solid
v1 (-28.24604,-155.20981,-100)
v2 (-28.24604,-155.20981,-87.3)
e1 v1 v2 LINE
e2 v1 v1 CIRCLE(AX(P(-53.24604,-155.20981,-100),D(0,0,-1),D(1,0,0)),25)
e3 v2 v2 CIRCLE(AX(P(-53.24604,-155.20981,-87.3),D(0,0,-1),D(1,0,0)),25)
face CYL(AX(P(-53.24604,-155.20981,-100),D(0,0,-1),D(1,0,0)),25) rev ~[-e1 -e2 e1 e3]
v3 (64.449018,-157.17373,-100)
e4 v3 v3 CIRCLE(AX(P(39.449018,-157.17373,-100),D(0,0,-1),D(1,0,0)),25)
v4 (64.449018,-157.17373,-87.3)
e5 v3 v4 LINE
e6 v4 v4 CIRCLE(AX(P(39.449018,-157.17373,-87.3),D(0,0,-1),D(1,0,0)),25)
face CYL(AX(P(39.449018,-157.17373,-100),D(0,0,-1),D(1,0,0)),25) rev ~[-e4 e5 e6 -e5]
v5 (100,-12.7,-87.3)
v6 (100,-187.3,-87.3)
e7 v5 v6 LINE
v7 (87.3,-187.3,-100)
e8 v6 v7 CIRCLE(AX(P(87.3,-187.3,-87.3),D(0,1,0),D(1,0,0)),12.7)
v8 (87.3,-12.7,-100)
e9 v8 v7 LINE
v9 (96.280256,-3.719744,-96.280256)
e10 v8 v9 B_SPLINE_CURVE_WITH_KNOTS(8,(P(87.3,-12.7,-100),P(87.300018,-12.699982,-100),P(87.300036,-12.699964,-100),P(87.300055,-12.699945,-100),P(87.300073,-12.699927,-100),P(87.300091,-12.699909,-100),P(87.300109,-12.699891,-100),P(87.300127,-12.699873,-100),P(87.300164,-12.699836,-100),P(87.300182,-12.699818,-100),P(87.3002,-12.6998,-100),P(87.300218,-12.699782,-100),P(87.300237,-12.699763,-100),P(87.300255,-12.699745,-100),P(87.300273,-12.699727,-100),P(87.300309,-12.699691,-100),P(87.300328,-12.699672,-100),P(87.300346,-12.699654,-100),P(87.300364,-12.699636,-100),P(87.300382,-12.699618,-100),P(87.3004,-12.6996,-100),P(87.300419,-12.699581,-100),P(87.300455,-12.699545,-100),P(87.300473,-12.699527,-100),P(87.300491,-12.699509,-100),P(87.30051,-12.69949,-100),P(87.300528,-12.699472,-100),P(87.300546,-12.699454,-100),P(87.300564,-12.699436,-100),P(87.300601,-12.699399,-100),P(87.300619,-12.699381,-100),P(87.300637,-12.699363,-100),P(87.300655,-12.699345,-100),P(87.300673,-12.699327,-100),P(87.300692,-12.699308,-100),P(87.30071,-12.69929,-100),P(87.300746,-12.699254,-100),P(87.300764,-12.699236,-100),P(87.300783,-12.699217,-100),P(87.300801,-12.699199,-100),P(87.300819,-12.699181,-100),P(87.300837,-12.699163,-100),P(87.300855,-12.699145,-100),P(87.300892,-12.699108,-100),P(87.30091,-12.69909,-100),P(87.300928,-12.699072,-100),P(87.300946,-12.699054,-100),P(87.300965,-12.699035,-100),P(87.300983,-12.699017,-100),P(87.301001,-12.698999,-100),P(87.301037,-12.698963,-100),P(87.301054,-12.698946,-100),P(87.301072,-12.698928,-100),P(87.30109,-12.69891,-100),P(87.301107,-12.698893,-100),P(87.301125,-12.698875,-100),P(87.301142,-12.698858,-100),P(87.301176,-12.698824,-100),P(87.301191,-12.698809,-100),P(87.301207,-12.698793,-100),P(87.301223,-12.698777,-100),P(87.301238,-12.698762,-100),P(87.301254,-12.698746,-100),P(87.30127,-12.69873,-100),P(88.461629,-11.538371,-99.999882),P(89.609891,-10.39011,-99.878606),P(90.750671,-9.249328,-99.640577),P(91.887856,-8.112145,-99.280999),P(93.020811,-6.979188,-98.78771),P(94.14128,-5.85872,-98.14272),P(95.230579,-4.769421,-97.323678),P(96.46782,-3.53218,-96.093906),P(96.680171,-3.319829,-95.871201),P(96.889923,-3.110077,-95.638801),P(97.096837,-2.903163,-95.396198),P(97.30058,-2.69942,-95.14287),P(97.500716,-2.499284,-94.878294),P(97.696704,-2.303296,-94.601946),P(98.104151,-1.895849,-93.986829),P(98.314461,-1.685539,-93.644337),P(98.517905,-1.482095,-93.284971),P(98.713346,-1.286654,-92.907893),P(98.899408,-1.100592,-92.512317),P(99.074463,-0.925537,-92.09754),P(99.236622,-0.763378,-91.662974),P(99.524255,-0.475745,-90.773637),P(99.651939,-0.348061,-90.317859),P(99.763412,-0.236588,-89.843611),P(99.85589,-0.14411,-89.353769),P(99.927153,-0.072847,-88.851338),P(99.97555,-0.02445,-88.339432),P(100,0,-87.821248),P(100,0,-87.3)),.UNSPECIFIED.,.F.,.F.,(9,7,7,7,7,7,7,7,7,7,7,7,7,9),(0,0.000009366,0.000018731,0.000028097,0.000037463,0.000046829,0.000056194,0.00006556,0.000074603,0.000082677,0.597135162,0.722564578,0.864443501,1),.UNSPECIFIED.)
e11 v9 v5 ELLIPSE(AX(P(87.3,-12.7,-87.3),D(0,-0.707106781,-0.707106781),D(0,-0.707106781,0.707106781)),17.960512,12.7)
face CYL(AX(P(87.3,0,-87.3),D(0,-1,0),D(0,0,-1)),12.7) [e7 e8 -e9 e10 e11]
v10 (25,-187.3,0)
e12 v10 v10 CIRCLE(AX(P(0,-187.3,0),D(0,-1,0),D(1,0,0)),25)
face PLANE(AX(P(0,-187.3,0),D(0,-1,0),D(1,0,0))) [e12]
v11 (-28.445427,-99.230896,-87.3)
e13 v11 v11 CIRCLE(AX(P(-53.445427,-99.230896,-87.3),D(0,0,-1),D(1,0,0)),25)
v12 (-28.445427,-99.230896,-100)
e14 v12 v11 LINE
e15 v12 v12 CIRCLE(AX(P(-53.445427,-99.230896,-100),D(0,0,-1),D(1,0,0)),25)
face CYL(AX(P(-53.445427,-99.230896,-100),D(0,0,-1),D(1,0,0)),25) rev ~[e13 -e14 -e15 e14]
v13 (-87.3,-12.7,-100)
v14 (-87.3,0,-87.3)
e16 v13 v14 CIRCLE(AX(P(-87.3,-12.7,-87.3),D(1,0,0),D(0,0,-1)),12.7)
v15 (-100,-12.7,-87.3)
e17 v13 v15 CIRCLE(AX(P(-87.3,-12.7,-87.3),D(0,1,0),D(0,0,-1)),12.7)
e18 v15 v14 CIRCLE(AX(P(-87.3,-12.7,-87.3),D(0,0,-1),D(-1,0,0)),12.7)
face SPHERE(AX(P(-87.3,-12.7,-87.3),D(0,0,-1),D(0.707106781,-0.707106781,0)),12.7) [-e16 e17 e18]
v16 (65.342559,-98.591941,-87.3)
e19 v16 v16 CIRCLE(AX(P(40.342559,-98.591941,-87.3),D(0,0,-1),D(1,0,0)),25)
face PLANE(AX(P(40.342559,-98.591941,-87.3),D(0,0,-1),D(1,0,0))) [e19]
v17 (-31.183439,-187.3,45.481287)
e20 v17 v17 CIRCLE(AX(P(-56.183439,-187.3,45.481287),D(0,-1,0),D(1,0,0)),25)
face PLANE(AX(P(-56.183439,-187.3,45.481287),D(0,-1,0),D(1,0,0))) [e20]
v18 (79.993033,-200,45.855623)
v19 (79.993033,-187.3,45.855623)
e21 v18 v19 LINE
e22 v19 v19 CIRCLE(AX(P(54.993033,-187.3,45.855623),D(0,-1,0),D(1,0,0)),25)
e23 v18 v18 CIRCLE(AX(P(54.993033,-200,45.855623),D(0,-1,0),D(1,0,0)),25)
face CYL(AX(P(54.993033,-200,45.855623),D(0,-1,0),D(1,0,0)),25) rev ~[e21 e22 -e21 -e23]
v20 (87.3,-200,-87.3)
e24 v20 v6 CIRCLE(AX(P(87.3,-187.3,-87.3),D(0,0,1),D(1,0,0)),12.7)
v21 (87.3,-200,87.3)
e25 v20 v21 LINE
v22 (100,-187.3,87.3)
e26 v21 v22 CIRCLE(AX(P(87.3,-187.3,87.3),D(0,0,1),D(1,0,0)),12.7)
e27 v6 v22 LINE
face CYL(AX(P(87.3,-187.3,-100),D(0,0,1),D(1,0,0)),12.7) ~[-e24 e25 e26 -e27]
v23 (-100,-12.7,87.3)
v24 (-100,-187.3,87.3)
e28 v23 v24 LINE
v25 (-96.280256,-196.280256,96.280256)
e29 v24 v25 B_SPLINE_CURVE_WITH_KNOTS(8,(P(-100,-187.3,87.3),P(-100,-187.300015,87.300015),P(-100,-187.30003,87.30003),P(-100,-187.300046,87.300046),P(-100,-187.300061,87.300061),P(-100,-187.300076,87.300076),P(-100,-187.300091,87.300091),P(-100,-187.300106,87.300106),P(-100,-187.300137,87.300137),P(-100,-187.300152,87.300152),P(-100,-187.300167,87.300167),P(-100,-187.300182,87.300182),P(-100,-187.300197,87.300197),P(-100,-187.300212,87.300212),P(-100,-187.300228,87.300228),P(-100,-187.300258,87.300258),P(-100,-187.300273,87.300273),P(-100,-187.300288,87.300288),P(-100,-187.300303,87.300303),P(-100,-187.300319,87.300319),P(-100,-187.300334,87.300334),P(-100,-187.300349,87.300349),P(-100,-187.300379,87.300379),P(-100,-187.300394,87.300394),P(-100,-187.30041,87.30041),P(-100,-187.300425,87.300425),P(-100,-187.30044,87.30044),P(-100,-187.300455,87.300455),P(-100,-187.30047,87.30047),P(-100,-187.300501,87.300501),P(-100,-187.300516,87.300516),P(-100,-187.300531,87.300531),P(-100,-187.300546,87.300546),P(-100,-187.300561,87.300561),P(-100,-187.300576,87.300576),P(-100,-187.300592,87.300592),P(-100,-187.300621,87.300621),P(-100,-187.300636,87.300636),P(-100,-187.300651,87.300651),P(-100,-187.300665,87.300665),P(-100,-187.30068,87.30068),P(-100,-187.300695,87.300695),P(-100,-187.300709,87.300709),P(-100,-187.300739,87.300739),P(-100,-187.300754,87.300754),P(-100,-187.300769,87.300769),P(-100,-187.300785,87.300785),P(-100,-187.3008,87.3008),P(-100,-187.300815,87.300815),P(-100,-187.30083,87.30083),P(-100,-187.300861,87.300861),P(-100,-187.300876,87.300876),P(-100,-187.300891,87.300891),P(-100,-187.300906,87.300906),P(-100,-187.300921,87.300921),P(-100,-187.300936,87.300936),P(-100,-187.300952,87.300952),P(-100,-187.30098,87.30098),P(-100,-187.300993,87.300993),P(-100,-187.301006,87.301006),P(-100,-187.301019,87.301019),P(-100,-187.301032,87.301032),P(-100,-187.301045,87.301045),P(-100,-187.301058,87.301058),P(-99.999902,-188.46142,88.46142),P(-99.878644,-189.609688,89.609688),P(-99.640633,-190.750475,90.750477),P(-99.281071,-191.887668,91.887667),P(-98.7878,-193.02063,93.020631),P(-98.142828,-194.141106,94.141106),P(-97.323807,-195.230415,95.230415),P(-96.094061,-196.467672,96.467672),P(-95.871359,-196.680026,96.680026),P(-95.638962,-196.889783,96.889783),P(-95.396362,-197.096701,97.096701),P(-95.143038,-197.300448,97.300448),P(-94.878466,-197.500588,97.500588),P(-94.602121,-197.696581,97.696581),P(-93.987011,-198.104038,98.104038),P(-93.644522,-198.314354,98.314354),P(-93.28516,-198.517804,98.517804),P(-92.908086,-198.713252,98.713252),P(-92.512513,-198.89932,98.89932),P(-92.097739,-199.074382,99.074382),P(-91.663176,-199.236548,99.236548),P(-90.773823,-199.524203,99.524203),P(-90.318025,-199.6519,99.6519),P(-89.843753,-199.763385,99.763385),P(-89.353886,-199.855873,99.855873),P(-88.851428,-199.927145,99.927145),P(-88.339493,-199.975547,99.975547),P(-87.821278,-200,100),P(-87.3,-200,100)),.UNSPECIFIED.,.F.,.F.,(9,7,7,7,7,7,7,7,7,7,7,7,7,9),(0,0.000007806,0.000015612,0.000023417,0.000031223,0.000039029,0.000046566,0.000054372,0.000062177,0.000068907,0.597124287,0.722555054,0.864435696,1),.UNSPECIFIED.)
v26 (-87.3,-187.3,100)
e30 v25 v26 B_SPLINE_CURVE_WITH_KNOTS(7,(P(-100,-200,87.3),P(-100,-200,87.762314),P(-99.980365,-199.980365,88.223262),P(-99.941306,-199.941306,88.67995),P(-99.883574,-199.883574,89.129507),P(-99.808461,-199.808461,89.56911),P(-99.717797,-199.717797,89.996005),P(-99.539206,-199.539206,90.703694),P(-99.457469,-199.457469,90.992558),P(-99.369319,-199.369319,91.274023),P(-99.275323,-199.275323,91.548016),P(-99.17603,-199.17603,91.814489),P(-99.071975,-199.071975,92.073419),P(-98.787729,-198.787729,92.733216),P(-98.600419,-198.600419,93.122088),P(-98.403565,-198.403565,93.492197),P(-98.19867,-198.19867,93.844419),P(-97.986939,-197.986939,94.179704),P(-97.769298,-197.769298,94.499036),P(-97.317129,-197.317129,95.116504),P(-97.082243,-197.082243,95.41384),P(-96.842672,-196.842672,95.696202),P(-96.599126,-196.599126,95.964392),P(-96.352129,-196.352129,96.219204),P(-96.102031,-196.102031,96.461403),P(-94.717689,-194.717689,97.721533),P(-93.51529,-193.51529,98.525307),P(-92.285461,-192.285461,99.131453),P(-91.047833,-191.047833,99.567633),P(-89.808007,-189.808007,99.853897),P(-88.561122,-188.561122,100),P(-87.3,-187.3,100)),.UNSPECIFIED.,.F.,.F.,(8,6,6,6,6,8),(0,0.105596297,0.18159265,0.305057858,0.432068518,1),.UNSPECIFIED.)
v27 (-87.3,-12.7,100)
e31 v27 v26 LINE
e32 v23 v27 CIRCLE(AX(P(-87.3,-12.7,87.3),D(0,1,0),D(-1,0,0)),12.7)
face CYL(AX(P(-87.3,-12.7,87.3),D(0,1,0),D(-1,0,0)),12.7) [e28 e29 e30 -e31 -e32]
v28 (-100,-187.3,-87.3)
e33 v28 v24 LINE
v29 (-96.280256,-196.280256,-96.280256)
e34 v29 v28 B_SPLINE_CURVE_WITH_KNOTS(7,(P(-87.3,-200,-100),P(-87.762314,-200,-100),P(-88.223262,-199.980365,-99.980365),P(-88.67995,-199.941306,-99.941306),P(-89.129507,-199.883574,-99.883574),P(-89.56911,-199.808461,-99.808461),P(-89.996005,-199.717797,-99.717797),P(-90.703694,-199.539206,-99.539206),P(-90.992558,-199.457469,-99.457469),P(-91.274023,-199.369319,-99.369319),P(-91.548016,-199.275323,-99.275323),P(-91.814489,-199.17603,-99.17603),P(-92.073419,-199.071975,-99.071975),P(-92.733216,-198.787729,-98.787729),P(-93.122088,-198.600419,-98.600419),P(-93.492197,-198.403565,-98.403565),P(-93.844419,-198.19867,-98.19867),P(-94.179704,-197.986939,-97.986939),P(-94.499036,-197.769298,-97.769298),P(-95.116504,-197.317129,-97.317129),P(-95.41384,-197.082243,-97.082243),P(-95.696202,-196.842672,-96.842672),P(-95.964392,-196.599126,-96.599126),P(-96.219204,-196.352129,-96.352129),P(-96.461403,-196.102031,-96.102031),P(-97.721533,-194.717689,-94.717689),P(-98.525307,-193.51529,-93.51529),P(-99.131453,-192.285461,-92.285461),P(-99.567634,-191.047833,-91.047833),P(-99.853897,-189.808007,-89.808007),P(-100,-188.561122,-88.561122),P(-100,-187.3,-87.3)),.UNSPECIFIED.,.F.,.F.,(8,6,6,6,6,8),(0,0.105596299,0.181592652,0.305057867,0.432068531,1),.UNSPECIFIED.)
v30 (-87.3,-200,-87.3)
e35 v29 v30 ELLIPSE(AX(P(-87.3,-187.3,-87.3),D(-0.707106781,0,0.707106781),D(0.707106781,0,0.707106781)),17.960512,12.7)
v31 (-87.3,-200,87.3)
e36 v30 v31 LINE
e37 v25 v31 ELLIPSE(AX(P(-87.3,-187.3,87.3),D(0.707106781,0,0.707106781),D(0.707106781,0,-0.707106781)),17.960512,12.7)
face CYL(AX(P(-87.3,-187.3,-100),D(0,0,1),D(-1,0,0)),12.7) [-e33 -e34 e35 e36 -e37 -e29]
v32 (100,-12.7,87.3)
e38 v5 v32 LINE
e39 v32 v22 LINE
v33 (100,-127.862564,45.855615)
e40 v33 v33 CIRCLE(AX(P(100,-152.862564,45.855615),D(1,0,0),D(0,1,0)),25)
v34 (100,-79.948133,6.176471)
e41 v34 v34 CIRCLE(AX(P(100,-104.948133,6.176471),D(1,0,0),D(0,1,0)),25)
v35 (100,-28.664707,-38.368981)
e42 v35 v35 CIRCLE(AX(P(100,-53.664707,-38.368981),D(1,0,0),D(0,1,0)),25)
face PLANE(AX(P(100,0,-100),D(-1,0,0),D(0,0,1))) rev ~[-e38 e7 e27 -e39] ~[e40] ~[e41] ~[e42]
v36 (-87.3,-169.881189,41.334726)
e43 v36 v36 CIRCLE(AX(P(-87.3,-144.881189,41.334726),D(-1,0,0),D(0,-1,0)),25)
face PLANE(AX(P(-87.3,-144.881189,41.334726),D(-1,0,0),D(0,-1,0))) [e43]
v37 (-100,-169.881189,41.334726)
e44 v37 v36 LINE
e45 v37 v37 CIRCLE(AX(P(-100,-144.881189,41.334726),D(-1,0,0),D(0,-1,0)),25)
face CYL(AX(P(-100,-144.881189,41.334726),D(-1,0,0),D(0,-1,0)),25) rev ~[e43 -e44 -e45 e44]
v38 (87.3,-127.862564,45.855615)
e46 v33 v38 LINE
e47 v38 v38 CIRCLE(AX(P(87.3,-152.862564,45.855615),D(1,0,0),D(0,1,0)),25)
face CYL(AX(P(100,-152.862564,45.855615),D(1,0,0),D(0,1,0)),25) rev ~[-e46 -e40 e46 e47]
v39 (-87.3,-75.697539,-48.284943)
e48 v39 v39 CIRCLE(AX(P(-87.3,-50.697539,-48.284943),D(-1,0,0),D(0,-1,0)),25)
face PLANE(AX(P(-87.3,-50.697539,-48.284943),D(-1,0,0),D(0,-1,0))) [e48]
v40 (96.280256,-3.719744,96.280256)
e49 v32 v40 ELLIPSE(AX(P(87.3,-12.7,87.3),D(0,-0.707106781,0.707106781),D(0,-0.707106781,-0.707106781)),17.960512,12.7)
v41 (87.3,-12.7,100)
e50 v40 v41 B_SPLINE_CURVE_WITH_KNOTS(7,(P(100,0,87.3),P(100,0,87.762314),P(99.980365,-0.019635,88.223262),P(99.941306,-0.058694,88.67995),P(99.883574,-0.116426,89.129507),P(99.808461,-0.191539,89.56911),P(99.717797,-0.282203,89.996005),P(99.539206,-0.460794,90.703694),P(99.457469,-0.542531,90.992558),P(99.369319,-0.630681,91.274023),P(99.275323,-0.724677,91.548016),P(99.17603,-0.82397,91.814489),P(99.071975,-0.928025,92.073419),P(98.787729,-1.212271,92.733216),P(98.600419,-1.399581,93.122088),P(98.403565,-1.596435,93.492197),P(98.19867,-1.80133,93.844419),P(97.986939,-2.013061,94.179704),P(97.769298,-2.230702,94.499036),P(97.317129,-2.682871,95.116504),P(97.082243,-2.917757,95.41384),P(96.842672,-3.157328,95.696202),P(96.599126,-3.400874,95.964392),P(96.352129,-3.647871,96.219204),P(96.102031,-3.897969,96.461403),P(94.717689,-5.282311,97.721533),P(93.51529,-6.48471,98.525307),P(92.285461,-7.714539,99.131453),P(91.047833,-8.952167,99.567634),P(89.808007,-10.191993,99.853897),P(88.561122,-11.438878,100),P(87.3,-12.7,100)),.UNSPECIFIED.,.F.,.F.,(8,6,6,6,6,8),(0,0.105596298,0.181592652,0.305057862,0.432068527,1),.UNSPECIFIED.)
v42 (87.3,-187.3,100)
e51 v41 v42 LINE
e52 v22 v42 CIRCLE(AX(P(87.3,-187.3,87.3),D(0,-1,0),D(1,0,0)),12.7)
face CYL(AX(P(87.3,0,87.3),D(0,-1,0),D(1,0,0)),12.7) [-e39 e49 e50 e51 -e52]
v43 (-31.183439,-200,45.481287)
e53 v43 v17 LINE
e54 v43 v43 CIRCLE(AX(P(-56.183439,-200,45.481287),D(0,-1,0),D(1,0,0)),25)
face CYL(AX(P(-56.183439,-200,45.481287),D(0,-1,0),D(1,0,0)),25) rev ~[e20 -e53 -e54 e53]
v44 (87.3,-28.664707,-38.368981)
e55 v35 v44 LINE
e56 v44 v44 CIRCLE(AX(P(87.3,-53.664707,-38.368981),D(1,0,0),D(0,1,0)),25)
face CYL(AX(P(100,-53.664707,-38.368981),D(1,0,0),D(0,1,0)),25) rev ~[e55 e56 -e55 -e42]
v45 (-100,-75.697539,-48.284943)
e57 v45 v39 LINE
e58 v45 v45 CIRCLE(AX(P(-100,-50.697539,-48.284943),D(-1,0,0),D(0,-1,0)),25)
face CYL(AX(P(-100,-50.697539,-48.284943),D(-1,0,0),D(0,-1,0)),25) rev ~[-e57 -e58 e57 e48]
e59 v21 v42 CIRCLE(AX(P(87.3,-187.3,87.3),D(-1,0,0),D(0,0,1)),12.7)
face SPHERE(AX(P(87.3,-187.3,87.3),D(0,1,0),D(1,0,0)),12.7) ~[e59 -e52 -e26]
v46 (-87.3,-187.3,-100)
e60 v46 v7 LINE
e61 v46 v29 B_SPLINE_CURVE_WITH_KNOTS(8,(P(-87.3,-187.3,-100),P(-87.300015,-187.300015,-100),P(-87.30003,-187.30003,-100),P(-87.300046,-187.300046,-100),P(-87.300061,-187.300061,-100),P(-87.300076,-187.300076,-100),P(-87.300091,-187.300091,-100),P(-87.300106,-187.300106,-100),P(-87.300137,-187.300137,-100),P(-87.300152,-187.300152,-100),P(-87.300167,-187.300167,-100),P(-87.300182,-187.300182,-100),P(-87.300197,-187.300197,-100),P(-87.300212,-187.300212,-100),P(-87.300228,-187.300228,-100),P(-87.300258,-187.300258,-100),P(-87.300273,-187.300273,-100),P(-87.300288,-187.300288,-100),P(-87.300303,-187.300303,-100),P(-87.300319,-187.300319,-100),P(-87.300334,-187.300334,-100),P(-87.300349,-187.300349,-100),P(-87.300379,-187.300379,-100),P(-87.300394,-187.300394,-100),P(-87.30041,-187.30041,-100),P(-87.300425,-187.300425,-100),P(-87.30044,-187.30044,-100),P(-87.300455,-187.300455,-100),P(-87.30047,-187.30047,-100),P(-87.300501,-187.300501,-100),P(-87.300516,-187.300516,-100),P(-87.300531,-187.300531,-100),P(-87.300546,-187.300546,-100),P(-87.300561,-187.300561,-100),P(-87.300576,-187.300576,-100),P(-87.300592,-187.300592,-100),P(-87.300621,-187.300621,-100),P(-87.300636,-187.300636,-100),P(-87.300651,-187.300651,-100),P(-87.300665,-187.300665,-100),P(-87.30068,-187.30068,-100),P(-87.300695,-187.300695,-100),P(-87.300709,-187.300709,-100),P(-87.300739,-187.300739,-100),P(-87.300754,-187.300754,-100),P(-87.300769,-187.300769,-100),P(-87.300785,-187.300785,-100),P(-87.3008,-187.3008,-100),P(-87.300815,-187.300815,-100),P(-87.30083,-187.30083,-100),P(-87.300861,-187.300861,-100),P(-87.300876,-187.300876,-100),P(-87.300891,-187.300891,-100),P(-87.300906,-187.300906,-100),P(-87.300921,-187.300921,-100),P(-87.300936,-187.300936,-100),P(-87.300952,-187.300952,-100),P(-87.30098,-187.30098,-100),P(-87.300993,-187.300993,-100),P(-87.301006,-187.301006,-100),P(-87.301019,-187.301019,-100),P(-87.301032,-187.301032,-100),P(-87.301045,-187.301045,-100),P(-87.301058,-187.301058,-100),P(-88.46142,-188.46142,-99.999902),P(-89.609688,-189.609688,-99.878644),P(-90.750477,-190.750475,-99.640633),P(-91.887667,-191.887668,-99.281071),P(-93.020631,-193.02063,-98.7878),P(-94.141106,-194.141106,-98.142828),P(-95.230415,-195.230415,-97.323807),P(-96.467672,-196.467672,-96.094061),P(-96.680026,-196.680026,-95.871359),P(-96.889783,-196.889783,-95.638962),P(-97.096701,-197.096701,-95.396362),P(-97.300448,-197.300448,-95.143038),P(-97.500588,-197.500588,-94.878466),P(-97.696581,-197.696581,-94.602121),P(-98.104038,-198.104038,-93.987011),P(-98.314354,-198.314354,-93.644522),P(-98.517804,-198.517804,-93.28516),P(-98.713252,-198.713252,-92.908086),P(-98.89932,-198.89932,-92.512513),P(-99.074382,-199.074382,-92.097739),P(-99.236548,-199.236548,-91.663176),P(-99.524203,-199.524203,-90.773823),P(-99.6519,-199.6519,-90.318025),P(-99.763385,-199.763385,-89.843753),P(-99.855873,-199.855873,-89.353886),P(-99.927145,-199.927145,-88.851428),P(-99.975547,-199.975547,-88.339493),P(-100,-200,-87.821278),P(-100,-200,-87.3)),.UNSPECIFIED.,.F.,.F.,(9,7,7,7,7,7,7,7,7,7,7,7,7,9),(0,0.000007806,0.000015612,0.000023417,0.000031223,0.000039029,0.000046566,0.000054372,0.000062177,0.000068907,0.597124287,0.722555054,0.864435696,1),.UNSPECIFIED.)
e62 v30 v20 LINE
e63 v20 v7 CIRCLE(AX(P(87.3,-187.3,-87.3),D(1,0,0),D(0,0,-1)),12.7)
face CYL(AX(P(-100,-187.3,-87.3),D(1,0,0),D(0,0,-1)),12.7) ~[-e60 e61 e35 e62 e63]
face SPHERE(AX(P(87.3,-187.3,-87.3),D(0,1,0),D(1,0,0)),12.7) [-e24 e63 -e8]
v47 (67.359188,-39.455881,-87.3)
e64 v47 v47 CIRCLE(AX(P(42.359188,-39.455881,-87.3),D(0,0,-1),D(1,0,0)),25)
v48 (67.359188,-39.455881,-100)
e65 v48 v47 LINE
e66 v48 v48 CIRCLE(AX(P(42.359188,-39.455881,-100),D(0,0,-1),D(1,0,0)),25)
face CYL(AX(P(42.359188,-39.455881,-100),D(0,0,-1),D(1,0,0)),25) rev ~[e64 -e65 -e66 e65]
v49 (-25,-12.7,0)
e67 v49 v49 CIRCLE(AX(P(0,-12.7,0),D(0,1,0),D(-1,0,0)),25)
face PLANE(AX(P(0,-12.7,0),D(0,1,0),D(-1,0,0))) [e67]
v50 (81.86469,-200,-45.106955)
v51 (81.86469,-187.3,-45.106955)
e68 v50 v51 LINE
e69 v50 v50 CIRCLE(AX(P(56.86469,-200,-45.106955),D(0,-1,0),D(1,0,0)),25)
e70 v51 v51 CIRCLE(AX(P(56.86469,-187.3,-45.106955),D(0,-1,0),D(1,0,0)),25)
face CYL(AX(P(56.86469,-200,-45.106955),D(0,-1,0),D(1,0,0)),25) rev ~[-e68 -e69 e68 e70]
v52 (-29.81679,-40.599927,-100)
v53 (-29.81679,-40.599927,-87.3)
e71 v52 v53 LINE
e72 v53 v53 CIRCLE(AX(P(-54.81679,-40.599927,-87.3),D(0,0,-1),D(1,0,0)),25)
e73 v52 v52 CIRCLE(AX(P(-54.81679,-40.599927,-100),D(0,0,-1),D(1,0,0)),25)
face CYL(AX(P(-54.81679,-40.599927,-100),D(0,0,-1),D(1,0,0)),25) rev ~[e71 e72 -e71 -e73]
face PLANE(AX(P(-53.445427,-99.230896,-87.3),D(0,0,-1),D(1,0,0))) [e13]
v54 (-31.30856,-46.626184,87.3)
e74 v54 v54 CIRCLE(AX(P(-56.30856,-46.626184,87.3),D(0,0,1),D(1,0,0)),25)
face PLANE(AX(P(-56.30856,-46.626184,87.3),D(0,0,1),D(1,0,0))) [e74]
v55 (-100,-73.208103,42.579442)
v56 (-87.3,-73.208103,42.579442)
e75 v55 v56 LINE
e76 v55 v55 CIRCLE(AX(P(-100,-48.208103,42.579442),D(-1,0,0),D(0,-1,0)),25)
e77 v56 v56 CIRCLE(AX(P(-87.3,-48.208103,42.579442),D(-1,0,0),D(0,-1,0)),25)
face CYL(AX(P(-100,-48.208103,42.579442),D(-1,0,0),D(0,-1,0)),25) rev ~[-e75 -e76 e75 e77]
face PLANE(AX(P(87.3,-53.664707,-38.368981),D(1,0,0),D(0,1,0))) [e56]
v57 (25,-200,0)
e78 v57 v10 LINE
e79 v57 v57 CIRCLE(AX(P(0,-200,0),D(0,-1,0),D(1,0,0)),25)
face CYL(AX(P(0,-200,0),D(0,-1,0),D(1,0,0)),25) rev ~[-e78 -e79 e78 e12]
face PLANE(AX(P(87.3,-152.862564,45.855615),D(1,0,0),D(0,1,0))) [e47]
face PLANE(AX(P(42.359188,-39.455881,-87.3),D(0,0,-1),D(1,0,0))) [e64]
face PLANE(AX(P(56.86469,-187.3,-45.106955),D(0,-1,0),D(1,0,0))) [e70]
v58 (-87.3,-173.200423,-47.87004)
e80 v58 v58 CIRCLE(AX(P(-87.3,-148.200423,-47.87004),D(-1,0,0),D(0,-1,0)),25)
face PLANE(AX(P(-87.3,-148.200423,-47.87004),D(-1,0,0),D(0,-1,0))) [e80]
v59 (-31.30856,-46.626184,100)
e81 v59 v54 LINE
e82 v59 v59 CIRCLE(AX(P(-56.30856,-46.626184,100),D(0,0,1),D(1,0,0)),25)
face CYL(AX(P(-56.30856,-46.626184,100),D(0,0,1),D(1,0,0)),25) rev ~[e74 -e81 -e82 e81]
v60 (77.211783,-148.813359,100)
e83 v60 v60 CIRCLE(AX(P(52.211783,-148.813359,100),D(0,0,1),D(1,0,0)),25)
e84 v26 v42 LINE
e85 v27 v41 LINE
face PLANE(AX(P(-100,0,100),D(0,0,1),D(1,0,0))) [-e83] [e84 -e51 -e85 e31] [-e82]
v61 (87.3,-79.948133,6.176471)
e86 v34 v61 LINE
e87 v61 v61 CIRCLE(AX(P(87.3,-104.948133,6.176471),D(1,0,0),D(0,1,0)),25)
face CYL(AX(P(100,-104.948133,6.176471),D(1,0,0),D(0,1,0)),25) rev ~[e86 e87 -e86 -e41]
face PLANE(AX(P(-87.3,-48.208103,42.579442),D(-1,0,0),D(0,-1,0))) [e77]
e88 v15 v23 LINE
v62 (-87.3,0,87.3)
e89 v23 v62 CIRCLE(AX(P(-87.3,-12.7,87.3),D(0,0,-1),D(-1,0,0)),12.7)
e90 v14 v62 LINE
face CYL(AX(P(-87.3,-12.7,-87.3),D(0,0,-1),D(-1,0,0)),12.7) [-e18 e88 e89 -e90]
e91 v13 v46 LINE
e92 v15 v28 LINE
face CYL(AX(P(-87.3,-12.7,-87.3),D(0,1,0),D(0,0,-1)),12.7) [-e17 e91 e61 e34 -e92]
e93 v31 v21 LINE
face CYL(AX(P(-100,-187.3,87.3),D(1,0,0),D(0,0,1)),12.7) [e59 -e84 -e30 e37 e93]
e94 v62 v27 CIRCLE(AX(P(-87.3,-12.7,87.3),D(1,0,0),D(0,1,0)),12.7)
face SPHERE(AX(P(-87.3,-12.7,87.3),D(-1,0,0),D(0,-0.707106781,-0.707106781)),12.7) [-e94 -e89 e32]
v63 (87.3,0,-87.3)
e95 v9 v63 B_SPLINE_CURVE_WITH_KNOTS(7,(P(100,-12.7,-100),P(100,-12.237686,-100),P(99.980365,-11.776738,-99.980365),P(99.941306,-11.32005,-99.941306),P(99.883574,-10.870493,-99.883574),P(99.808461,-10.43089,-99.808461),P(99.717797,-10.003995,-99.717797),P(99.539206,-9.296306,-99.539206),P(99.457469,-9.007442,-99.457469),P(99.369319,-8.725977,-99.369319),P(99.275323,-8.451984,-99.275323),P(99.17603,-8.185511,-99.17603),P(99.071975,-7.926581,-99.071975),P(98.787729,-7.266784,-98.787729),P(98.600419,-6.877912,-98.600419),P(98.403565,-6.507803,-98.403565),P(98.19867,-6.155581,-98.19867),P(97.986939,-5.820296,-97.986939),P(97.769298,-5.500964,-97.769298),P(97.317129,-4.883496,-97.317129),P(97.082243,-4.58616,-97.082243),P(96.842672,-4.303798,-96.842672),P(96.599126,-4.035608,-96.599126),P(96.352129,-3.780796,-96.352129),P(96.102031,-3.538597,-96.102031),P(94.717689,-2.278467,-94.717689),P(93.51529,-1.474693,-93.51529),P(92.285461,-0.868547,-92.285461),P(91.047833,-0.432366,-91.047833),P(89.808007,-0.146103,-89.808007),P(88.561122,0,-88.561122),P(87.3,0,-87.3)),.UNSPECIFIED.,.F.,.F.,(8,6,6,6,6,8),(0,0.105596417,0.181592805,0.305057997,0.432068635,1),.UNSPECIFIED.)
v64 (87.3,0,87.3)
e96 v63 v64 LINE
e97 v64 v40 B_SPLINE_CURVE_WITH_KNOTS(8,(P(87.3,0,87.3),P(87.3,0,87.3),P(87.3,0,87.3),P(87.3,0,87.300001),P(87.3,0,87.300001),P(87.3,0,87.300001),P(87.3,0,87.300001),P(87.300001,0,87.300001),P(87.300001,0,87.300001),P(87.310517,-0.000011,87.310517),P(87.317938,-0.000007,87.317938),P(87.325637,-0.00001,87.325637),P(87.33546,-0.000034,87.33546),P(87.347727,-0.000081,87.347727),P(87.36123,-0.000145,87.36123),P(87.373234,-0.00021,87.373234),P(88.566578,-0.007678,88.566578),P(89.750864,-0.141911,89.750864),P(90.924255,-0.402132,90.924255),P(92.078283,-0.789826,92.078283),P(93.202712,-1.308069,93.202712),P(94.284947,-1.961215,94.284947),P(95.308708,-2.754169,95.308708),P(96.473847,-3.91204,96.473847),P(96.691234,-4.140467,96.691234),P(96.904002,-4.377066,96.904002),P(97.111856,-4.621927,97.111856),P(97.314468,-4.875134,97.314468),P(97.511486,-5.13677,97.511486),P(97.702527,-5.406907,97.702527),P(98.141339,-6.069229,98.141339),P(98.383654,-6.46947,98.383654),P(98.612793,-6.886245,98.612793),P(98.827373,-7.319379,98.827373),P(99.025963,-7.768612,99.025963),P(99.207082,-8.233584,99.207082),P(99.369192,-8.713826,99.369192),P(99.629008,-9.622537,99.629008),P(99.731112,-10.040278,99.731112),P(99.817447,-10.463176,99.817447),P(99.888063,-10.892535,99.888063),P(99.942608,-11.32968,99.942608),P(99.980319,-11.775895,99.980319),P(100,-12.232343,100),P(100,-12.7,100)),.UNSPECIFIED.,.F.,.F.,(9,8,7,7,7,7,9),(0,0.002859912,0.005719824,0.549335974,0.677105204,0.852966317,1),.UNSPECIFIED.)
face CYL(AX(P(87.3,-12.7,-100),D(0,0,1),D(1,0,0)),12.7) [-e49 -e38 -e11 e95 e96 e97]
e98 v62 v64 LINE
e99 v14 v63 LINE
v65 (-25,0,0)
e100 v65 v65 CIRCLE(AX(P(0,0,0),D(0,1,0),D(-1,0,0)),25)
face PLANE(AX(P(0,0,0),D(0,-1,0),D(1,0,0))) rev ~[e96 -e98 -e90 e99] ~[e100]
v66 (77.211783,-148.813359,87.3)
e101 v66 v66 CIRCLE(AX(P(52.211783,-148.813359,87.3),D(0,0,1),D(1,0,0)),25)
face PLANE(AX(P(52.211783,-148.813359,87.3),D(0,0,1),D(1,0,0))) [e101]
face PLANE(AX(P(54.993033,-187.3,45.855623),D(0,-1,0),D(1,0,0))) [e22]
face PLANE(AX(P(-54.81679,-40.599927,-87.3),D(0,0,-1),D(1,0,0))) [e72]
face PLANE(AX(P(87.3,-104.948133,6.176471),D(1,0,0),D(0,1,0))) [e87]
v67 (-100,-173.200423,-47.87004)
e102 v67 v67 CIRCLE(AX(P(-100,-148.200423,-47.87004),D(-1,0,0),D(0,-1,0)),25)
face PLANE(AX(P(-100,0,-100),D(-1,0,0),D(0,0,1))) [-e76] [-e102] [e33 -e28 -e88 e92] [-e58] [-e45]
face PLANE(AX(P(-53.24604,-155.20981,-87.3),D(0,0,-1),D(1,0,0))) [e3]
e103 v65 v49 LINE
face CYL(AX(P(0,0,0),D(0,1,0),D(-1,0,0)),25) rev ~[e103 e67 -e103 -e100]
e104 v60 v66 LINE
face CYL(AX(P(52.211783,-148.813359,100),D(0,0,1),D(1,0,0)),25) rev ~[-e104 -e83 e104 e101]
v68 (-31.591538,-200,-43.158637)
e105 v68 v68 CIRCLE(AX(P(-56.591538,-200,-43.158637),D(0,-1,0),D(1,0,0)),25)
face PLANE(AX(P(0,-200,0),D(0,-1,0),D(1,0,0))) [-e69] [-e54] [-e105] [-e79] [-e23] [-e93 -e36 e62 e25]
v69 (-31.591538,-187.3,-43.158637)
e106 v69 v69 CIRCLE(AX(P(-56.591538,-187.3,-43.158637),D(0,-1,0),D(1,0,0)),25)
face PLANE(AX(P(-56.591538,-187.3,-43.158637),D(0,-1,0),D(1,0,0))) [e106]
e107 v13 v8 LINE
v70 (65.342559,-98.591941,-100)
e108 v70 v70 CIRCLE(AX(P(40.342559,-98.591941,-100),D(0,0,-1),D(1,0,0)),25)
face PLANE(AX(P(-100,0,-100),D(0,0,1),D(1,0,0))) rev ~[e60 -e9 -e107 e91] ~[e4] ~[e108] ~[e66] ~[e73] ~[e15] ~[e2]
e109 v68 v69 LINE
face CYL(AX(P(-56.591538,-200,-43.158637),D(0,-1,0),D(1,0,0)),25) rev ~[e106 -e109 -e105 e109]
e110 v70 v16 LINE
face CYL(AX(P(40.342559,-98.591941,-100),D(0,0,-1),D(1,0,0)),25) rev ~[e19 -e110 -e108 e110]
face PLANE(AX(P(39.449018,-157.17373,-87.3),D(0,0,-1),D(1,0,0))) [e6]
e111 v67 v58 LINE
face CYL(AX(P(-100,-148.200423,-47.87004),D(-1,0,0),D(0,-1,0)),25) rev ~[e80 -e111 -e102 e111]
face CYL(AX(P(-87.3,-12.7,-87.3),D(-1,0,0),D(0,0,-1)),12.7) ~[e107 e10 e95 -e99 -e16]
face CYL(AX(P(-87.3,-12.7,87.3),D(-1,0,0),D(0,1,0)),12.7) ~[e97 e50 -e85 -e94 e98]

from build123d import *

# Parameters (mm, degrees)
F0_W         = 200
F0_H         = 200
F1_DEPTH     = 200
F2_R         = 12.7
F3_T1_DEPTH  = 206.35
F3_T3_DEPTH  = 174.6
F3_T5_DEPTH  = 206.35
F3_S9_W      = 12.954
F3_S9_H      = 12.954
F3_T10_DEPTH = 12.954
F3_S15_W     = 12.954
F3_S15_H     = 12.954
F3_T16_DEPTH = 12.954
F4_R         = 25
F5_DEPTH     = 12.7
F6_R         = 25
F7_DEPTH     = 12.7
F8_DEPTH     = 12.7
F9_R         = 25
F10_DEPTH    = 12.7
F11_R        = 25
F12_DEPTH    = 12.7
F13_R        = 25
F14_DEPTH    = 12.7
F15_R        = 25
F16_DEPTH    = 12.7


# Not quite as in the source:
# - a fillet or chamfer that OpenCascade refuses, or shapes differently, is made with other operations: its cross-section is extruded or revolved along the edge and cut away or added


with BuildPart() as f1:
    # F0 (on Front) → F1 (new body)
    with BuildSketch(Plane.XZ):
        Rectangle(F0_W, F0_H)
    extrude(amount=F1_DEPTH)

    # F2
    f2_edges = [f1.edges().sort_by_distance(p)[0] for p in [
        (100, -100, -100),
        (100, -100, 100),
        (100, 0, 0),
        (100, -200, 0),
        (0, -200, -100),
        (0, -200, 100),
        (-100, -200, 0),
    ]]
    fillet(f2_edges, radius=F2_R)

    # F3: fillet of radius 12.7 on 11 edges, made by hand

    # F3_s2 → F3_t1 (cut)
    with BuildSketch(Plane.XZ.offset(12.7)):
        with BuildLine():
            ThreePointArc((-100, 87.3), (-96.2802561211, 96.2802561211), (-87.3, 100))
            Line((-87.3, 100), (-100, 100))
            Line((-100, 100), (-100, 87.3))
        make_face()
        with BuildLine():
            ThreePointArc((-87.3, -100), (-96.2802561211, -96.2802561211), (-100, -87.3))
            Line((-100, -87.3), (-100, -100))
            Line((-100, -100), (-87.3, -100))
        make_face()
    extrude(amount=F3_T1_DEPTH, mode=Mode.SUBTRACT)

    # F3_s4 → F3_t3 (cut)
    with BuildSketch(Plane.XY.offset(-87.3)):
        with BuildLine():
            ThreePointArc((-100, -12.7), (-96.2802561211, -3.7197438789), (-87.3, 0))
            Line((-87.3, 0), (-100, 0))
            Line((-100, 0), (-100, -12.7))
        make_face()
    extrude(amount=F3_T3_DEPTH, mode=Mode.SUBTRACT)

    # F3_s6 → F3_t5 (cut)
    with BuildSketch(Plane.YZ.offset(-87.3)):
        with BuildLine():
            ThreePointArc((0, 87.3), (-3.7197438789, 96.2802561211), (-12.7, 100))
            Line((-12.7, 100), (0, 100))
            Line((0, 100), (0, 87.3))
        make_face()
        with BuildLine():
            ThreePointArc((-12.7, -100), (-3.7197438789, -96.2802561211), (0, -87.3))
            Line((0, -87.3), (0, -100))
            Line((0, -100), (-12.7, -100))
        make_face()
    extrude(amount=F3_T5_DEPTH, mode=Mode.SUBTRACT)


with BuildPart() as f3_tool8:
    # F3_s9 → F3_t10 (new body)
    with BuildSketch(Plane.YZ.offset(-87.3)):
        with Locations((-6.223, 93.777)):
            Rectangle(F3_S9_W, F3_S9_H)
    extrude(amount=-F3_T10_DEPTH)

    # F3_s11 → F3_t12 (revolve, cut)
    with BuildSketch(Plane(origin=(-87.3, -12.7, 87.3), x_dir=(0, -0.7071067812, -0.7071067812), z_dir=(0, 0.7071067812, -0.7071067812))):
        with BuildLine():
            ThreePointArc((0, -12.7), (12.7, 0), (0, 12.7))
            Line((0, 12.7), (0, -12.7))
        make_face()
    revolve(axis=Axis((-87.3, -12.7, 87.3), (-1, 0, 0)), mode=Mode.SUBTRACT)


with BuildPart() as f1_1:
    add(f1.part)

    # F3_t7: cut F3_tool8
    add(f3_tool8.part, mode=Mode.SUBTRACT)


with BuildPart() as f3_tool14:
    # F3_s15 → F3_t16 (new body)
    with BuildSketch(Plane.XY.offset(-87.3)):
        with Locations((-93.777, -6.223)):
            Rectangle(F3_S15_W, F3_S15_H)
    extrude(amount=-F3_T16_DEPTH)

    # F3_s17 → F3_t18 (revolve, cut)
    with BuildSketch(Plane(origin=(-87.3, -12.7, -87.3), x_dir=(0.7071067812, -0.7071067812, 0), z_dir=(0.7071067812, 0.7071067812, 0))):
        with BuildLine():
            ThreePointArc((0, -12.7), (12.7, 0), (0, 12.7))
            Line((0, 12.7), (0, -12.7))
        make_face()
    revolve(axis=Axis((-87.3, -12.7, -87.3), (0, 0, -1)), mode=Mode.SUBTRACT)


with BuildPart() as f1_2:
    add(f1_1.part)

    # F3_t13: cut F3_tool14
    add(f3_tool14.part, mode=Mode.SUBTRACT)

    # F4 (on face) → F5 (cut)
    with BuildSketch(Plane(origin=(0, 0, 0), x_dir=(-1, 0, 0), z_dir=(0, 1, 0))):
        Circle(F4_R)
    extrude(amount=-F5_DEPTH, mode=Mode.SUBTRACT)

    # F6 (on face) → F7 (cut)
    with BuildSketch(Plane.XY.offset(100)):
        with Locations((-56.3085600734, -46.6261841357)):
            Circle(F6_R)
        with Locations((52.2117828626, -148.8133593049)):
            Circle(F6_R)
    extrude(amount=-F7_DEPTH, mode=Mode.SUBTRACT)

    # F6 (on face) → F8 (cut)
    with BuildSketch(Plane.XY.offset(100)):
        with Locations((-56.3085600734, -46.6261841357)):
            Circle(F6_R)
        with Locations((52.2117828626, -148.8133593049)):
            Circle(F6_R)
    extrude(amount=-F8_DEPTH, mode=Mode.SUBTRACT)

    # F9 (on face) → F10 (cut)
    with BuildSketch(Plane.YZ.offset(100)):
        with Locations((-152.8625637293, 45.855615288)):
            Circle(F9_R)
        with Locations((-104.9481332302, 6.1764707789)):
            Circle(F9_R)
        with Locations((-53.6647066474, -38.3689813316)):
            Circle(F9_R)
    extrude(amount=-F10_DEPTH, mode=Mode.SUBTRACT)

    # F11 (on face) → F12 (cut)
    with BuildSketch(Plane(origin=(-100, 0, 0), x_dir=(0, -1, 0), z_dir=(-1, 0, 0))):
        with Locations((50.6975390017, -48.2849427062)):
            Circle(F11_R)
        with Locations((48.2081025839, 42.5794422626)):
            Circle(F11_R)
        with Locations((144.8811888695, 41.3347259164)):
            Circle(F11_R)
        with Locations((148.2004225254, -47.8700399399)):
            Circle(F11_R)
    extrude(amount=-F12_DEPTH, mode=Mode.SUBTRACT)

    # F13 (on face) → F14 (cut)
    with BuildSketch(Plane.XZ.offset(200)):
        with Locations((-56.1834387481, 45.481286943)):
            Circle(F13_R)
        with Locations((-56.5915383924, -43.1586373624)):
            Circle(F13_R)
        with Locations((56.8646900356, -45.1069548726)):
            Circle(F13_R)
        with Locations((54.9930334091, 45.8556227386)):
            Circle(F13_R)
        Circle(F13_R)
    extrude(amount=-F14_DEPTH, mode=Mode.SUBTRACT)

    # F15 (on face) → F16 (cut)
    with BuildSketch(Plane(origin=(0, 0, -100), x_dir=(1, 0, 0), z_dir=(0, 0, -1))):
        with Locations((-53.2460398972, 155.2098095417)):
            Circle(F15_R)
        with Locations((-53.4454273642, 99.2308959943)):
            Circle(F15_R)
        with Locations((-54.8167897346, 40.5999273626)):
            Circle(F15_R)
        with Locations((39.449018472, 157.1737299708)):
            Circle(F15_R)
        with Locations((40.3425594879, 98.5919412215)):
            Circle(F15_R)
        with Locations((42.359188109, 39.4558809987)):
            Circle(F15_R)
    extrude(amount=-F16_DEPTH, mode=Mode.SUBTRACT)


solid = f1_2.part
